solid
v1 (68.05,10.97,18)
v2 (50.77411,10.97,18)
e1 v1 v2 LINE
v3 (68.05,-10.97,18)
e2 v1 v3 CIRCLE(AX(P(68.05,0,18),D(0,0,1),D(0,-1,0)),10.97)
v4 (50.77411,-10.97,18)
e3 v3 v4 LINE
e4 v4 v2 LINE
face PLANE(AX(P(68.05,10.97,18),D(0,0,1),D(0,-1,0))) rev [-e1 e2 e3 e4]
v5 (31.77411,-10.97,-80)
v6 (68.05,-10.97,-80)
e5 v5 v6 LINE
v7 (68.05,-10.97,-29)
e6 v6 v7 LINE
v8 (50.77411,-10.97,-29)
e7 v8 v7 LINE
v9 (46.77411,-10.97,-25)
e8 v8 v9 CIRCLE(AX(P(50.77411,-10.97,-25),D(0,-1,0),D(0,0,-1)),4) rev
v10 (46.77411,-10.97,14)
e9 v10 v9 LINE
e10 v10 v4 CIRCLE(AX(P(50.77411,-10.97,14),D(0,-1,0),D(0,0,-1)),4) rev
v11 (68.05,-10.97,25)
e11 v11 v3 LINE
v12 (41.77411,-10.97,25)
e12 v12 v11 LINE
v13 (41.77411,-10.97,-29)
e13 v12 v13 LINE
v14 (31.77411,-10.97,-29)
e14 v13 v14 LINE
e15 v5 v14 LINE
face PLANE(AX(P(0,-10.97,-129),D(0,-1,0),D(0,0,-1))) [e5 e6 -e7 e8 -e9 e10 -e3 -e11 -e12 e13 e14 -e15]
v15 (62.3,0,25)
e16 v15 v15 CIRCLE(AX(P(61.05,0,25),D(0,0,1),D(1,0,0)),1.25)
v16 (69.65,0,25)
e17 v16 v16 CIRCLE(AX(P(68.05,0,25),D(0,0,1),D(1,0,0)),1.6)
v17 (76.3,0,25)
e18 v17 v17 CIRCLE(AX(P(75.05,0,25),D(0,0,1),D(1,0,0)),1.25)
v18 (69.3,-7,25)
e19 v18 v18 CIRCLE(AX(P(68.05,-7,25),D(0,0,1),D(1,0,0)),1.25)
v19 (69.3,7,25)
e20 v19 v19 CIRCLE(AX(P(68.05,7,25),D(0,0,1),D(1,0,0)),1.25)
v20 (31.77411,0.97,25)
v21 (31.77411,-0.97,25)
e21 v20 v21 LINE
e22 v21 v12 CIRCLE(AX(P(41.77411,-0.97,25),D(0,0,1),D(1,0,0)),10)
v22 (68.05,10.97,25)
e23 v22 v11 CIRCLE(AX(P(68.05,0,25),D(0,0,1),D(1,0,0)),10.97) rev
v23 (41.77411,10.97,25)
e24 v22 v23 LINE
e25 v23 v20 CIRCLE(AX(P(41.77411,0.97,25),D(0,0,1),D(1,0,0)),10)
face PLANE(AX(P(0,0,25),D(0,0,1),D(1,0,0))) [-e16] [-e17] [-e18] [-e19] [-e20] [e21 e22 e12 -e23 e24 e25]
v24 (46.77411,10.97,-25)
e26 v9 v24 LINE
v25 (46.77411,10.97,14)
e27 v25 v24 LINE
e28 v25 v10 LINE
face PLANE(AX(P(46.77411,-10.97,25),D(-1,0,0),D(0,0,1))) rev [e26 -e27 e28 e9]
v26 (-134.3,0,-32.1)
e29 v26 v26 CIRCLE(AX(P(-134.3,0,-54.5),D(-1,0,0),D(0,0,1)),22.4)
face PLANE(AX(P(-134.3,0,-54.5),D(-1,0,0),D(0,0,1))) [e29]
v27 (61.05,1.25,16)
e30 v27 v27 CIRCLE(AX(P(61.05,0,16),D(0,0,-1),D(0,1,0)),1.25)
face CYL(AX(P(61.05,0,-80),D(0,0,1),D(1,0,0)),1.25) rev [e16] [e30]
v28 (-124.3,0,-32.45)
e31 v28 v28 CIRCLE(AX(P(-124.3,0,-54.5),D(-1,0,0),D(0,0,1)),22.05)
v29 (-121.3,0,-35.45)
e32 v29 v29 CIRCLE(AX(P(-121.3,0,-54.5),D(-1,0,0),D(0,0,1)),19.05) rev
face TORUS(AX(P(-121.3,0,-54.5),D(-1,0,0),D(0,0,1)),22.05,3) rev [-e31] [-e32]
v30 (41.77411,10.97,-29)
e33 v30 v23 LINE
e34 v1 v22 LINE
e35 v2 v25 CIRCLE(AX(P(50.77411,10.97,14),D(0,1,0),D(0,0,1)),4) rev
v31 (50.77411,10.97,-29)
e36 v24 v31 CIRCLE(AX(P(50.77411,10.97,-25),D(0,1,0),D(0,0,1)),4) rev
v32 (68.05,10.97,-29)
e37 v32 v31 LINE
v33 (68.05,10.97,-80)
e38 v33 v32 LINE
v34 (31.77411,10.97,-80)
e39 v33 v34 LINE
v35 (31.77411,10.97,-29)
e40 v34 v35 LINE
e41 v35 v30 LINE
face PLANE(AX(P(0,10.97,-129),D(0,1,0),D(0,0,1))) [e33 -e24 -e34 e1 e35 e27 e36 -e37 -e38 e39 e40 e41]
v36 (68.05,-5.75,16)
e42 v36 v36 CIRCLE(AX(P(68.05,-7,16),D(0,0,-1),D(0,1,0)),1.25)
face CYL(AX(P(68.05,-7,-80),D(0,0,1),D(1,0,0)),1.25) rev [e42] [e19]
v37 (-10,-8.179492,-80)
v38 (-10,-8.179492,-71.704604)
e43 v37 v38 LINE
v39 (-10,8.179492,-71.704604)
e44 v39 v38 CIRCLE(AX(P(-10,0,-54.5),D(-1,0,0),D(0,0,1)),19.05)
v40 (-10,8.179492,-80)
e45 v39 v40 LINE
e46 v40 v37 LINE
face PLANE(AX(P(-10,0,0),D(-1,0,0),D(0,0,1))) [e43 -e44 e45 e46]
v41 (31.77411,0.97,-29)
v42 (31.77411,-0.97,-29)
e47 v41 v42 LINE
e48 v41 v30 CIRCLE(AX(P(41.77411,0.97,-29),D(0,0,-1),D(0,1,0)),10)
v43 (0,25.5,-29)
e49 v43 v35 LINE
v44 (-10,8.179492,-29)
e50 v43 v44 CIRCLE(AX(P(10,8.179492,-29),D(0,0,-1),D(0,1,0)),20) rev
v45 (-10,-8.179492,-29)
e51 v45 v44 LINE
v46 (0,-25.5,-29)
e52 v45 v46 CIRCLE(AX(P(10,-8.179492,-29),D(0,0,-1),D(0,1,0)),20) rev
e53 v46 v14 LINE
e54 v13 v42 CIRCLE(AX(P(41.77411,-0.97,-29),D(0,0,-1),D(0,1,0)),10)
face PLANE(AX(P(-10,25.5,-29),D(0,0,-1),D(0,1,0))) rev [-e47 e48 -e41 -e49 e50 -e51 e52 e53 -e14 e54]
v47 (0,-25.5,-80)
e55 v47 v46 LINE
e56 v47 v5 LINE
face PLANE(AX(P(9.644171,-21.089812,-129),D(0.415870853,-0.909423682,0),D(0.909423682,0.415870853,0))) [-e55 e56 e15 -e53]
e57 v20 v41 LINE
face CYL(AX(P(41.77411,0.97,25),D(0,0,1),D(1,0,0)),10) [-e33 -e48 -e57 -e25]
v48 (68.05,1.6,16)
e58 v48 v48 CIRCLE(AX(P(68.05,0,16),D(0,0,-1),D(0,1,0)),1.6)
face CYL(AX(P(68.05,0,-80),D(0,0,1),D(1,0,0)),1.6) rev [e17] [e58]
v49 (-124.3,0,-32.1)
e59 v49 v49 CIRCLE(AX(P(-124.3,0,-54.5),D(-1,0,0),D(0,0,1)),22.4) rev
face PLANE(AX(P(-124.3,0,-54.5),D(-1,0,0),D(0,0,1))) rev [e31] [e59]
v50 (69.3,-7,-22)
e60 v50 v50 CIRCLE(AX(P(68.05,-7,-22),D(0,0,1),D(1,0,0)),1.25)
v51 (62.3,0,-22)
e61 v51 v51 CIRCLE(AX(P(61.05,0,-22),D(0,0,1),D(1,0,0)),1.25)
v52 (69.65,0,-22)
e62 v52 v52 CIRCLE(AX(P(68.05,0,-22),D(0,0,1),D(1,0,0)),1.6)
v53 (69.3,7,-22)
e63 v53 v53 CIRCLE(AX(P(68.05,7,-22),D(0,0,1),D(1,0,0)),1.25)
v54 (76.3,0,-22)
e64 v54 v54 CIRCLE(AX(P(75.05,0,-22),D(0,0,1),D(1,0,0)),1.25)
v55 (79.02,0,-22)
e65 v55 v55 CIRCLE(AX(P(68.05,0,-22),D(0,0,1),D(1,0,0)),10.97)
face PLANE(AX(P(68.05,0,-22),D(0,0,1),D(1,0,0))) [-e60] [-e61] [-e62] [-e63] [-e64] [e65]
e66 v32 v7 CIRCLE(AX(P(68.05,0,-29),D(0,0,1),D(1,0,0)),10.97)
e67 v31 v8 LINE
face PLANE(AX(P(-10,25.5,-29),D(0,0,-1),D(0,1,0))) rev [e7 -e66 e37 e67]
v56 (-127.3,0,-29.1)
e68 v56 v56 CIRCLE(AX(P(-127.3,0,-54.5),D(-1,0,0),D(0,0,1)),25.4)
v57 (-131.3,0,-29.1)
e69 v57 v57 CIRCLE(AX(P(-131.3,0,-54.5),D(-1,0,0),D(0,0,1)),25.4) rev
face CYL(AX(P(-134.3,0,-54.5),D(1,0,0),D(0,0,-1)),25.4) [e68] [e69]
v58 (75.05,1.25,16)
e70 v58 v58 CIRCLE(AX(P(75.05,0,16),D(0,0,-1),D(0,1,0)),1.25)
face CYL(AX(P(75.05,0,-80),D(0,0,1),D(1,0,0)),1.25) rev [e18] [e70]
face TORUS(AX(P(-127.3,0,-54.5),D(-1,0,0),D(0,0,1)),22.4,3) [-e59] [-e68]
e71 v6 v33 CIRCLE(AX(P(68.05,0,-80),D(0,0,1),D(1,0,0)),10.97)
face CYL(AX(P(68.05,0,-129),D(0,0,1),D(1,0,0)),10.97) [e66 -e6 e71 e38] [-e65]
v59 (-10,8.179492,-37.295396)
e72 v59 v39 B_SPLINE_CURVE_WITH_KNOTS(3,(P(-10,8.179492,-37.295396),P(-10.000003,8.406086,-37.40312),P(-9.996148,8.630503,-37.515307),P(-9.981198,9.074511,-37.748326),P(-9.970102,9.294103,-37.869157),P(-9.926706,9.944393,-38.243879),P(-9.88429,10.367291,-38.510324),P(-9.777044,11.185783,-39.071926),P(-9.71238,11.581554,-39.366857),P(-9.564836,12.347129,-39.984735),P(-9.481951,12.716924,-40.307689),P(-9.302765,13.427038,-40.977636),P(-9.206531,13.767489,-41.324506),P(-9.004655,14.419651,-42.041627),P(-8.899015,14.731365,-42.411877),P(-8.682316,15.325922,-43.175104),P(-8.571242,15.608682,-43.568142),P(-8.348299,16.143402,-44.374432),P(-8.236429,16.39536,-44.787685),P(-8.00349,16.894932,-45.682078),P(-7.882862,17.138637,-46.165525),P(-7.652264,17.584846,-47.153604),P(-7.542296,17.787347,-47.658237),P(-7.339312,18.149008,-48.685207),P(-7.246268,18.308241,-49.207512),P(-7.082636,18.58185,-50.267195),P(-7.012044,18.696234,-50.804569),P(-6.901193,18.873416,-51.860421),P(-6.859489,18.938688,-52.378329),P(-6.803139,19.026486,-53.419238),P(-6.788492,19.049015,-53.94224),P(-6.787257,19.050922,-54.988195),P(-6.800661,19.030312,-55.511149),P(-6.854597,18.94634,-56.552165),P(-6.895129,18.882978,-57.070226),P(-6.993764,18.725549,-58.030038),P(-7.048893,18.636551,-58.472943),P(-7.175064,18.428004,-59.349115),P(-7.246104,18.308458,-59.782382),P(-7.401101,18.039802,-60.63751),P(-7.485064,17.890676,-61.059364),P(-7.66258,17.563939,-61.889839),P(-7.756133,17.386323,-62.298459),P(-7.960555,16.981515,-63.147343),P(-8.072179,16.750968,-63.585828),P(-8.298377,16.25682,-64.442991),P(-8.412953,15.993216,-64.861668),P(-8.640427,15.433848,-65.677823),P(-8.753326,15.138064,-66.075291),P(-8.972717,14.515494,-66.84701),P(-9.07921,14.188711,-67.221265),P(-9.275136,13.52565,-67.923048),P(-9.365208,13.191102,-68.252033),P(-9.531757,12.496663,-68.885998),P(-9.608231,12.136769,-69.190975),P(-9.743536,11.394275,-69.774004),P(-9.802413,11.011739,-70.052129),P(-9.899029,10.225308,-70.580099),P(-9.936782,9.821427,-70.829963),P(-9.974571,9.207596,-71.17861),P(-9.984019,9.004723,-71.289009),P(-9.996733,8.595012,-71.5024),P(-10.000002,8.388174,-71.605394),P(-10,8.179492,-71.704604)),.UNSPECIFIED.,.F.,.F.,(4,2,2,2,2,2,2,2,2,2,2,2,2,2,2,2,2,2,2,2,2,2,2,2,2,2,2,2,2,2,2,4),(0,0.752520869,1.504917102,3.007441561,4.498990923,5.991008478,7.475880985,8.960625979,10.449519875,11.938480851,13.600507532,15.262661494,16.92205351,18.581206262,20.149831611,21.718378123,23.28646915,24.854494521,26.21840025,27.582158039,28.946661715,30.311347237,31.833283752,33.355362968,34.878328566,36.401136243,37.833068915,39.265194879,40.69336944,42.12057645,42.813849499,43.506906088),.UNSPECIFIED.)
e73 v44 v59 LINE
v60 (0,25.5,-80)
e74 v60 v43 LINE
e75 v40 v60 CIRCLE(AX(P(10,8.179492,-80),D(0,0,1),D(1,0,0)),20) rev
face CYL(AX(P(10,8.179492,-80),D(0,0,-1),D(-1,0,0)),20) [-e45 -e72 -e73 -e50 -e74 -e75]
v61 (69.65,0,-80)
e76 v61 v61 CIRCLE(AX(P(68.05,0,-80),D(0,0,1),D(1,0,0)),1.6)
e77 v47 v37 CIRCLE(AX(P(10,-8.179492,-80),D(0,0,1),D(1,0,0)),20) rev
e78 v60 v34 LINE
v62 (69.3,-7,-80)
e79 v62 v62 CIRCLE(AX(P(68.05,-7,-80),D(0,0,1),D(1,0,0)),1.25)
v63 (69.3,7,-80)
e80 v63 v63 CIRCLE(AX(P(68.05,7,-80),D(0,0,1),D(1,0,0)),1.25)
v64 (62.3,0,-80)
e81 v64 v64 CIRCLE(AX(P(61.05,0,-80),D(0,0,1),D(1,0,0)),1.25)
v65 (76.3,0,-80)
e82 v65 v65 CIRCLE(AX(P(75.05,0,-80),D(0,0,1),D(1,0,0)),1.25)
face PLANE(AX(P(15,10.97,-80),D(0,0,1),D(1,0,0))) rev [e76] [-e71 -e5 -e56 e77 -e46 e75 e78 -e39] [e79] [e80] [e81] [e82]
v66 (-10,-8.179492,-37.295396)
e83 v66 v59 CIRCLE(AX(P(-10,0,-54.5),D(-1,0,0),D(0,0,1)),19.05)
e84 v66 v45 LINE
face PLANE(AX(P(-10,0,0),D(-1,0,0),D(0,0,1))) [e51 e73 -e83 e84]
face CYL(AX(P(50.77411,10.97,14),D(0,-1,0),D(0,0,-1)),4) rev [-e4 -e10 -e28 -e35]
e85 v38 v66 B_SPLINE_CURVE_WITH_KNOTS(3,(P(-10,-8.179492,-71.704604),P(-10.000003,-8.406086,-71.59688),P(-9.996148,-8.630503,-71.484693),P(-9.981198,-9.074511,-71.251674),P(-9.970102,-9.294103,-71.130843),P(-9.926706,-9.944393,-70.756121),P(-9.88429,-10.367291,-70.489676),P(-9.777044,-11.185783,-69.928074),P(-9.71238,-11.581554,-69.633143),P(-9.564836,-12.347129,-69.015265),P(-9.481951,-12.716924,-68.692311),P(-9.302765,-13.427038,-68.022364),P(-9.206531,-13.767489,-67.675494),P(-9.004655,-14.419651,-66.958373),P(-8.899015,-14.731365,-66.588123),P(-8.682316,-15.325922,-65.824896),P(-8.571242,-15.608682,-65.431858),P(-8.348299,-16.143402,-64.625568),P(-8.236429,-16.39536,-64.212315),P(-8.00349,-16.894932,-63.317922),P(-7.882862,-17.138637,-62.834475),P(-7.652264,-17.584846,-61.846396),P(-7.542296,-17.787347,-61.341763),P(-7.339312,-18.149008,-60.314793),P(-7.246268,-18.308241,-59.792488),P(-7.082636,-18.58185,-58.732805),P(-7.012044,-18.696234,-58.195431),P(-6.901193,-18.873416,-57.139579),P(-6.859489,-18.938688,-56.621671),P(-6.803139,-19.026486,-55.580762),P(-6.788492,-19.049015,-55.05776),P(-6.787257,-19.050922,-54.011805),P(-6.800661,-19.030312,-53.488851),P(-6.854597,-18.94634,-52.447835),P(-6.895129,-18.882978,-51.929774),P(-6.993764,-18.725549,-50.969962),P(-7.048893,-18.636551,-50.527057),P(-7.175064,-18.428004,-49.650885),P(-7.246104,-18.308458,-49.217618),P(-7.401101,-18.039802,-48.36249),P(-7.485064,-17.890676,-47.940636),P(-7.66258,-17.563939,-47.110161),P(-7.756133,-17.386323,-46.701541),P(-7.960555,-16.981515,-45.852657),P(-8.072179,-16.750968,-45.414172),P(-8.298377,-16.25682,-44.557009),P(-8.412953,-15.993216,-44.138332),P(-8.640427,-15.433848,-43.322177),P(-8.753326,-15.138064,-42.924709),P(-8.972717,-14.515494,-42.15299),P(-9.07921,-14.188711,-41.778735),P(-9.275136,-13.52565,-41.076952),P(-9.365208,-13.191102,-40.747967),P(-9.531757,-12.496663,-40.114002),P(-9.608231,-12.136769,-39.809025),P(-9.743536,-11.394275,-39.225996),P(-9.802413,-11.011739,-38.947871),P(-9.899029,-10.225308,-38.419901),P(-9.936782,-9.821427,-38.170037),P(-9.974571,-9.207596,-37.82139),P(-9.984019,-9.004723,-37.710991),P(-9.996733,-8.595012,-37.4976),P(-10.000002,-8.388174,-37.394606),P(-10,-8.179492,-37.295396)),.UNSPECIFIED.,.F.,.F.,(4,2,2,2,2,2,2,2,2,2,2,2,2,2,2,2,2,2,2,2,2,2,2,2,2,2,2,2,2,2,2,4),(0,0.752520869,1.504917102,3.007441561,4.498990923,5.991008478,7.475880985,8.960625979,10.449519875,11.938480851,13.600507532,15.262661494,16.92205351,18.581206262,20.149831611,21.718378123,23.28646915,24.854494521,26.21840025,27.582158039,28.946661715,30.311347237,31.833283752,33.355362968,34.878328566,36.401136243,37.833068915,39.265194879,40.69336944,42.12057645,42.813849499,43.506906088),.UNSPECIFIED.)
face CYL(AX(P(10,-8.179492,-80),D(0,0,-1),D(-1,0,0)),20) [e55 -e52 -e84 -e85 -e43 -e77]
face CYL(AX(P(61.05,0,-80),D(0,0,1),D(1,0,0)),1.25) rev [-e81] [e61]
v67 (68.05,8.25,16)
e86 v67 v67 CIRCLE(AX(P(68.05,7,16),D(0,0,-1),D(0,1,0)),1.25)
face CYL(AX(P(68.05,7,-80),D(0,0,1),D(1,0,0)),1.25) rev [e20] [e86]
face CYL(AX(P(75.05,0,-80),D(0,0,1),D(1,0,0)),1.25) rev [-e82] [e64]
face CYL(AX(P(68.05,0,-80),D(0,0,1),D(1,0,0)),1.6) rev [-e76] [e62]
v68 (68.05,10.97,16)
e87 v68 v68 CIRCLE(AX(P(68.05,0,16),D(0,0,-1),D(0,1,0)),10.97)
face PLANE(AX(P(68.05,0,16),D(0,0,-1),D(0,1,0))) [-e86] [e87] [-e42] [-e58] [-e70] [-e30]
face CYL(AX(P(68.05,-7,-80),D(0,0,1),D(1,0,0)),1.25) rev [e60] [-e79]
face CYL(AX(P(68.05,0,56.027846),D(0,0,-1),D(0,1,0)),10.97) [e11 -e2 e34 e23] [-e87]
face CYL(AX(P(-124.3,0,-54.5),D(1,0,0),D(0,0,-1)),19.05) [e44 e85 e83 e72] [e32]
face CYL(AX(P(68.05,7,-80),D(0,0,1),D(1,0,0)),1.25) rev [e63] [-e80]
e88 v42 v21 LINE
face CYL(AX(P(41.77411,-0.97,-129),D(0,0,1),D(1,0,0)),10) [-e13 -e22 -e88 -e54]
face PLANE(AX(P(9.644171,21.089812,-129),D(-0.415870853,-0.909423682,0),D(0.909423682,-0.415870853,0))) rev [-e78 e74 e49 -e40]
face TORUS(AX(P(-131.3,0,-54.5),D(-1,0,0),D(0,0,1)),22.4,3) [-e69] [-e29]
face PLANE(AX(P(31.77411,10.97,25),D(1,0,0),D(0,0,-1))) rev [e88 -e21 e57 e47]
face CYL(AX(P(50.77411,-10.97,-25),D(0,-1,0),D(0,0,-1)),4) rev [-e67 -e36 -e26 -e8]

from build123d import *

# Parameters (mm, degrees)
BOSS_EXTRUDE1_DEPTH       = 15
SKETCH2_R                 = 10.97
SKETCH2_R_2               = 1.6
SKETCH2_R_3               = 1.25
BOSS_EXTRUDE2_DEPTH       = 5.89
CUT_EXTRUDE1_START        = -100
SKETCH3_R                 = 1.25
SKETCH3_R_2               = 1.6
CUT_EXTRUDE1_DEPTH        = 100
SKETCH4_W                 = 50
SKETCH4_H                 = 21.94
BOSS_EXTRUDE3_DEPTH       = 49.02
SKETCH9_W                 = 51
SKETCH9_H                 = 51
BOSS_EXTRUDE7_DEPTH       = 10
SKETCH10_R                = 19.05
BOSS_EXTRUDE8_DEPTH       = 114.3
SKETCH11_R                = 25.4
BOSS_EXTRUDE9_DEPTH       = 10
SKETCH12_W                = 15
SKETCH12_H                = 21.94
BOSS_EXTRUDE10_DEPTH      = 30
BOSS_EXTRUDE11_START      = -20.89
SKETCH13_R                = 10.97
SKETCH13_R_2              = 1.6
SKETCH13_R_3              = 1.25
BOSS_EXTRUDE11_DEPTH      = 20.89
CUT_EXTRUDE2_START        = -20.89
SKETCH15_R                = 1.6
SKETCH15_R_2              = 1.25
CUT_EXTRUDE2_DEPTH        = 20.89
SKETCH17_W                = 51
SKETCH17_H                = 51
BOSS_EXTRUDE12_DEPTH      = 79.02
SKETCH18_W                = 30.492655515
SKETCH18_H                = 30.492655514
CUT_EXTRUDE3_DEPTH        = 64
SKETCH19_W                = 15
SKETCH19_H                = 21.94
BOSS_EXTRUDE13_DEPTH      = 29
BOSS_EXTRUDE14_START      = -20.98
SKETCH20_R                = 10.97
SKETCH20_R_2              = 1.6
SKETCH20_R_3              = 1.25
BOSS_EXTRUDE14_DEPTH      = 20.98
CUT_EXTRUDE4_START        = -20.98
SKETCH21_R                = 1.6
SKETCH21_R_2              = 1.25
CUT_EXTRUDE4_DEPTH        = 20.98
SKETCH23_W                = 42.482123656
SKETCH23_H                = 33.824616935
CUT_EXTRUDE6_DEPTH        = 100
FILLET6_R                 = 3
FILLET7_R                 = 3
CUT_EXTRUDE16_DEPTH       = 100
FILLET9_R                 = 20
FILLET10_R                = 20
SKETCH45_W                = 15
SKETCH45_H                = 21.94
BOSS_EXTRUDE19_DEPTH      = 54
SKETCH46_W                = 7
SKETCH46_H                = 21.94
BOSS_EXTRUDE20_DEPTH      = 21.27589
BOSS_EXTRUDE21_DEPTH      = 2
BOSS_EXTRUDE21_DEPTH_BACK = 7
SKETCH47_R                = 10.97
FILLET11_R                = 10
FILLET12_R                = 4
BOSS_EXTRUDE22_START      = 7
SKETCH50_R                = 10.97
BOSS_EXTRUDE22_DEPTH      = 7
CUT_EXTRUDE18_DEPTH       = 149.494915794
CUT_EXTRUDE18_DEPTH_BACK  = 149.494915794
SKETCH51_R                = 1.6
SKETCH51_R_2              = 1.25


with BuildPart() as part:
    # Sketch1 → Boss-Extrude1 (new body)
    with BuildSketch(Plane(origin=(0, 0, 0), x_dir=(0, 0, -1), z_dir=(1, 0, 0))):
        with BuildLine():
            Line((0, 10.97), (80, 10.97))
            Line((80, 10.97), (80, -10.97))
            Line((80, -10.97), (0, -10.97))
            ThreePointArc((0, -10.97), (-10.97, 0), (0, 10.97))
        make_face()
    extrude(amount=BOSS_EXTRUDE1_DEPTH)

    # Sketch2 → Boss-Extrude2 (add)
    with BuildSketch(Plane(origin=(15, 0, 0), x_dir=(0, 0, -1), z_dir=(1, 0, 0))):
        with Locations(Location((0, 0, 0), (0, 0, 270))):
            Circle(SKETCH2_R)
        Circle(SKETCH2_R_2, mode=Mode.SUBTRACT)
        with Locations((0, 6.58)):
            Circle(SKETCH2_R_3, mode=Mode.SUBTRACT)
        with Locations((6.58, 0)):
            Circle(SKETCH2_R_3, mode=Mode.SUBTRACT)
        with Locations((0, -6.58)):
            Circle(SKETCH2_R_3, mode=Mode.SUBTRACT)
        with Locations((-6.58, 0)):
            Circle(SKETCH2_R_3, mode=Mode.SUBTRACT)
    extrude(amount=BOSS_EXTRUDE2_DEPTH)

    # Sketch3 → Cut-Extrude1 (cut)
    with BuildSketch(Plane(origin=(20.89, 0, 0), x_dir=(0, 0, -1), z_dir=(1, 0, 0)).offset(CUT_EXTRUDE1_START)):
        with Locations((0, 6.58)):
            Circle(SKETCH3_R)
        Circle(SKETCH3_R_2)
        with Locations((0, -6.58)):
            Circle(SKETCH3_R)
        with Locations((-6.58, 0)):
            Circle(SKETCH3_R)
        with Locations((6.58, 0)):
            Circle(SKETCH3_R)
    extrude(amount=CUT_EXTRUDE1_DEPTH, mode=Mode.SUBTRACT)

    # Sketch4 → Boss-Extrude3 (add)
    with BuildSketch(Plane(origin=(15, 0, 0), x_dir=(0, 0, -1), z_dir=(1, 0, 0))):
        with Locations((55, 0)):
            Rectangle(SKETCH4_W, SKETCH4_H)
    extrude(amount=BOSS_EXTRUDE3_DEPTH)

    # Sketch9 → Boss-Extrude7 (add)
    with BuildSketch(Plane.ZY):
        with Locations((-54.5, 0)):
            Rectangle(SKETCH9_W, SKETCH9_H)
    extrude(amount=BOSS_EXTRUDE7_DEPTH)

    # Sketch10 → Boss-Extrude8 (add)
    with BuildSketch(Plane.ZY.offset(10)):
        with Locations((-54.5, 0)):
            Circle(SKETCH10_R)
    extrude(amount=BOSS_EXTRUDE8_DEPTH)

    # Sketch11 → Boss-Extrude9 (add)
    with BuildSketch(Plane.ZY.offset(124.3)):
        with Locations((-54.5, 0)):
            Circle(SKETCH11_R)
    extrude(amount=BOSS_EXTRUDE9_DEPTH)

    # Sketch12 → Boss-Extrude10 (add)
    with BuildSketch(Plane.XY.offset(-30)):
        with Locations((56.52, 0)):
            Rectangle(SKETCH12_W, SKETCH12_H)
    extrude(amount=BOSS_EXTRUDE10_DEPTH)

    # Sketch13 → Boss-Extrude11 (add)
    with BuildSketch(Plane(origin=(64.02, 0, 0), x_dir=(0, 0, -1), z_dir=(1, 0, 0)).offset(BOSS_EXTRUDE11_START)):
        with Locations(Location((0, 0, 0), (0, 0, 270))):
            Circle(SKETCH13_R)
        Circle(SKETCH13_R_2, mode=Mode.SUBTRACT)
        with Locations((6.58, 0)):
            Circle(SKETCH13_R_3, mode=Mode.SUBTRACT)
        with Locations((0, 6.58)):
            Circle(SKETCH13_R_3, mode=Mode.SUBTRACT)
        with Locations((0, -6.58)):
            Circle(SKETCH13_R_3, mode=Mode.SUBTRACT)
        with Locations((-6.58, 0)):
            Circle(SKETCH13_R_3, mode=Mode.SUBTRACT)
    extrude(amount=BOSS_EXTRUDE11_DEPTH)

    # Sketch15 → Cut-Extrude2 (cut)
    with BuildSketch(Plane(origin=(64.02, 0, 0), x_dir=(0, 0, -1), z_dir=(1, 0, 0)).offset(CUT_EXTRUDE2_START)):
        Circle(SKETCH15_R)
        with Locations((0, 6.58)):
            Circle(SKETCH15_R_2)
        with Locations((6.58, 0)):
            Circle(SKETCH15_R_2)
        with Locations((0, -6.58)):
            Circle(SKETCH15_R_2)
        with Locations((-6.58, 0)):
            Circle(SKETCH15_R_2)
    extrude(amount=CUT_EXTRUDE2_DEPTH, mode=Mode.SUBTRACT)

    # Sketch17 → Boss-Extrude12 (add)
    with BuildSketch(Plane(origin=(0, 0, 0), x_dir=(0, 0, -1), z_dir=(1, 0, 0))):
        with Locations((54.5, 0)):
            Rectangle(SKETCH17_W, SKETCH17_H)
    extrude(amount=BOSS_EXTRUDE12_DEPTH)

    # Sketch18 → Cut-Extrude3 (cut)
    with BuildSketch(Plane.XY.offset(-29)):
        with Locations((54.797648863, -1.842094242)):
            Rectangle(SKETCH18_W, SKETCH18_H)
    extrude(amount=CUT_EXTRUDE3_DEPTH, mode=Mode.SUBTRACT)

    # Sketch19 → Boss-Extrude13 (add)
    with BuildSketch(Plane.XY.offset(-29)):
        with Locations((71.52, 0)):
            Rectangle(SKETCH19_W, SKETCH19_H)
    extrude(amount=BOSS_EXTRUDE13_DEPTH)

    # Sketch20 → Boss-Extrude14 (add)
    with BuildSketch(Plane(origin=(79.02, 0, 0), x_dir=(0, 0, -1), z_dir=(1, 0, 0)).offset(BOSS_EXTRUDE14_START)):
        with Locations(Location((0, 0, 0), (0, 0, 270))):
            Circle(SKETCH20_R)
        Circle(SKETCH20_R_2, mode=Mode.SUBTRACT)
        with Locations((0, 6.58)):
            Circle(SKETCH20_R_3, mode=Mode.SUBTRACT)
        with Locations((6.58, 0)):
            Circle(SKETCH20_R_3, mode=Mode.SUBTRACT)
        with Locations((0, -6.58)):
            Circle(SKETCH20_R_3, mode=Mode.SUBTRACT)
        with Locations((-6.58, 0)):
            Circle(SKETCH20_R_3, mode=Mode.SUBTRACT)
    extrude(amount=BOSS_EXTRUDE14_DEPTH)

    # Sketch21 → Cut-Extrude4 (cut)
    with BuildSketch(Plane(origin=(79.02, 0, 0), x_dir=(0, 0, -1), z_dir=(1, 0, 0)).offset(CUT_EXTRUDE4_START)):
        Circle(SKETCH21_R)
        with Locations((0, 6.58)):
            Circle(SKETCH21_R_2)
        with Locations((6.58, 0)):
            Circle(SKETCH21_R_2)
        with Locations((0, -6.58)):
            Circle(SKETCH21_R_2)
        with Locations((-6.58, 0)):
            Circle(SKETCH21_R_2)
    extrude(amount=CUT_EXTRUDE4_DEPTH, mode=Mode.SUBTRACT)

    # Sketch23 → Cut-Extrude6 (cut)
    with BuildSketch(Plane(origin=(79.02, 0, 0), x_dir=(0, 0, -1), z_dir=(1, 0, 0))):
        with Locations((7.758938172, -1.322691532)):
            Rectangle(SKETCH23_W, SKETCH23_H)
    extrude(amount=-CUT_EXTRUDE6_DEPTH, mode=Mode.SUBTRACT)

    # Fillet6
    fillet6_edges = [part.edges().sort_by_distance(p)[0] for p in [
        (-124.3, 0, -73.55),
        (-124.3, 0, -79.9),
    ]]
    fillet(fillet6_edges, radius=FILLET6_R)

    # Fillet7
    fillet7_edges = [part.edges().sort_by_distance(p)[0] for p in [
        (-134.3, 0, -79.9),
    ]]
    fillet(fillet7_edges, radius=FILLET7_R)

    # Sketch41 → Cut-Extrude16 (cut)
    with BuildSketch(Plane.XY.offset(-29)):
        with BuildLine():
            Line((79.02, 25.5), (0, 25.5))
            Line((0, 25.5), (31.774109721, 10.97))
            Line((31.774109721, 10.97), (68.05, 10.97))
            ThreePointArc((68.05, 10.97), (75.80696139, 7.75696139), (79.02, 0))
            Line((79.02, 0), (79.02, 25.5))
        make_face()
        with BuildLine():
            Line((31.774109721, -10.97), (0, -25.5))
            Line((0, -25.5), (79.02, -25.5))
            Line((79.02, -25.5), (79.02, 0))
            ThreePointArc((79.02, 0), (75.80696139, -7.75696139), (68.05, -10.97))
            Line((68.05, -10.97), (31.774109721, -10.97))
        make_face()
    extrude(amount=-CUT_EXTRUDE16_DEPTH, mode=Mode.SUBTRACT)

    # Fillet9
    # the kernel refuses this fillet: 20 mm, written as the material it takes off along each edge
    with BuildSketch(Plane(origin=(-10, 25.5, -123.301270189), x_dir=(0, -1, 0), z_dir=(0, 0, 1))) as fillet9_piece_1_section:
        with BuildLine():
            CenterArc((17.320508076, 20), FILLET9_R, 210, 60)
            Line((0, 10), (0, 0))
            Line((0, 0), (17.320508076, 0))
        make_face()
    fillet9_piece_1 = extrude(amount=137.602540378, mode=Mode.PRIVATE)
    fillet9_piece_1 = fillet9_piece_1 - Plane(origin=(-10, 0, -54.5), x_dir=(0, 0, 1), z_dir=(1, 0, 0)) * Cylinder(19.05, 345, mode=Mode.PRIVATE)
    add(fillet9_piece_1, mode=Mode.SUBTRACT)

    # Fillet10
    # the kernel refuses this fillet: 20 mm, written as the material it takes off along each edge
    with BuildSketch(Plane(origin=(-10, -25.5, 14.301270189), x_dir=(0, 1, 0), z_dir=(0, 0, -1))) as fillet10_piece_1_section:
        with BuildLine():
            CenterArc((17.320508076, 20), FILLET10_R, 210, 60)
            Line((0, 10), (0, 0))
            Line((0, 0), (17.320508076, 0))
        make_face()
    fillet10_piece_1 = extrude(amount=137.602540378, mode=Mode.PRIVATE)
    fillet10_piece_1 = fillet10_piece_1 - Plane(origin=(-10, 0, -54.5), x_dir=(0, 0, 1), z_dir=(1, 0, 0)) * Cylinder(19.05, 345, mode=Mode.PRIVATE)
    add(fillet10_piece_1, mode=Mode.SUBTRACT)

    # Sketch45 → Boss-Extrude19 (add)
    with BuildSketch(Plane.XY.offset(-29)):
        with Locations((39.274109721, 0)):
            Rectangle(SKETCH45_W, SKETCH45_H)
    extrude(amount=BOSS_EXTRUDE19_DEPTH)

    # Sketch46 → Boss-Extrude20 (add)
    with BuildSketch(Plane(origin=(46.774109721, 0, 0), x_dir=(0, 0, -1), z_dir=(1, 0, 0))):
        with Locations((-21.5, 0)):
            Rectangle(SKETCH46_W, SKETCH46_H)
    extrude(amount=BOSS_EXTRUDE20_DEPTH)

    # Sketch47 → Boss-Extrude21 (add, two sides: drawn at the far end of the back side and taken through both)
    with BuildSketch(Plane(origin=(0, 0, 18), x_dir=(-1, 0, 0), z_dir=(0, 0, -1)).offset(-BOSS_EXTRUDE21_DEPTH_BACK)):
        with Locations(Location((-68.05, 0, 0), (0, 0, 90))):
            Circle(SKETCH47_R)
    extrude(amount=BOSS_EXTRUDE21_DEPTH + BOSS_EXTRUDE21_DEPTH_BACK)

    # Fillet11
    fillet11_edges = [part.edges().sort_by_distance(p)[0] for p in [
        (31.774109721, 10.97, -2),
        (31.774109721, -10.97, -2),
    ]]
    fillet(fillet11_edges, radius=FILLET11_R)

    # Fillet12
    fillet12_edges = [part.edges().sort_by_distance(p)[0] for p in [
        (46.774109721, 0, -29),
        (46.774109721, 0, 18),
    ]]
    fillet(fillet12_edges, radius=FILLET12_R)

    # Sketch50 → Boss-Extrude22 (add)
    with BuildSketch(Plane.XY.offset(-29).offset(BOSS_EXTRUDE22_START)):
        with Locations((68.05, 0)):
            Circle(SKETCH50_R)
    extrude(amount=-BOSS_EXTRUDE22_DEPTH)

    # Sketch51 → Cut-Extrude18 (cut, two sides: drawn at the far end of the back side and taken through both)
    with BuildSketch(Plane.XY.offset(-22).offset(-CUT_EXTRUDE18_DEPTH_BACK)):
        with Locations((68.05, 0)):
            Circle(SKETCH51_R)
        with Locations((68.05, 7)):
            Circle(SKETCH51_R_2)
        with Locations((75.05, 0)):
            Circle(SKETCH51_R_2)
        with Locations((68.05, -7)):
            Circle(SKETCH51_R_2)
        with Locations((61.05, 0)):
            Circle(SKETCH51_R_2)
    extrude(amount=CUT_EXTRUDE18_DEPTH + CUT_EXTRUDE18_DEPTH_BACK, mode=Mode.SUBTRACT)


solid = part.part
